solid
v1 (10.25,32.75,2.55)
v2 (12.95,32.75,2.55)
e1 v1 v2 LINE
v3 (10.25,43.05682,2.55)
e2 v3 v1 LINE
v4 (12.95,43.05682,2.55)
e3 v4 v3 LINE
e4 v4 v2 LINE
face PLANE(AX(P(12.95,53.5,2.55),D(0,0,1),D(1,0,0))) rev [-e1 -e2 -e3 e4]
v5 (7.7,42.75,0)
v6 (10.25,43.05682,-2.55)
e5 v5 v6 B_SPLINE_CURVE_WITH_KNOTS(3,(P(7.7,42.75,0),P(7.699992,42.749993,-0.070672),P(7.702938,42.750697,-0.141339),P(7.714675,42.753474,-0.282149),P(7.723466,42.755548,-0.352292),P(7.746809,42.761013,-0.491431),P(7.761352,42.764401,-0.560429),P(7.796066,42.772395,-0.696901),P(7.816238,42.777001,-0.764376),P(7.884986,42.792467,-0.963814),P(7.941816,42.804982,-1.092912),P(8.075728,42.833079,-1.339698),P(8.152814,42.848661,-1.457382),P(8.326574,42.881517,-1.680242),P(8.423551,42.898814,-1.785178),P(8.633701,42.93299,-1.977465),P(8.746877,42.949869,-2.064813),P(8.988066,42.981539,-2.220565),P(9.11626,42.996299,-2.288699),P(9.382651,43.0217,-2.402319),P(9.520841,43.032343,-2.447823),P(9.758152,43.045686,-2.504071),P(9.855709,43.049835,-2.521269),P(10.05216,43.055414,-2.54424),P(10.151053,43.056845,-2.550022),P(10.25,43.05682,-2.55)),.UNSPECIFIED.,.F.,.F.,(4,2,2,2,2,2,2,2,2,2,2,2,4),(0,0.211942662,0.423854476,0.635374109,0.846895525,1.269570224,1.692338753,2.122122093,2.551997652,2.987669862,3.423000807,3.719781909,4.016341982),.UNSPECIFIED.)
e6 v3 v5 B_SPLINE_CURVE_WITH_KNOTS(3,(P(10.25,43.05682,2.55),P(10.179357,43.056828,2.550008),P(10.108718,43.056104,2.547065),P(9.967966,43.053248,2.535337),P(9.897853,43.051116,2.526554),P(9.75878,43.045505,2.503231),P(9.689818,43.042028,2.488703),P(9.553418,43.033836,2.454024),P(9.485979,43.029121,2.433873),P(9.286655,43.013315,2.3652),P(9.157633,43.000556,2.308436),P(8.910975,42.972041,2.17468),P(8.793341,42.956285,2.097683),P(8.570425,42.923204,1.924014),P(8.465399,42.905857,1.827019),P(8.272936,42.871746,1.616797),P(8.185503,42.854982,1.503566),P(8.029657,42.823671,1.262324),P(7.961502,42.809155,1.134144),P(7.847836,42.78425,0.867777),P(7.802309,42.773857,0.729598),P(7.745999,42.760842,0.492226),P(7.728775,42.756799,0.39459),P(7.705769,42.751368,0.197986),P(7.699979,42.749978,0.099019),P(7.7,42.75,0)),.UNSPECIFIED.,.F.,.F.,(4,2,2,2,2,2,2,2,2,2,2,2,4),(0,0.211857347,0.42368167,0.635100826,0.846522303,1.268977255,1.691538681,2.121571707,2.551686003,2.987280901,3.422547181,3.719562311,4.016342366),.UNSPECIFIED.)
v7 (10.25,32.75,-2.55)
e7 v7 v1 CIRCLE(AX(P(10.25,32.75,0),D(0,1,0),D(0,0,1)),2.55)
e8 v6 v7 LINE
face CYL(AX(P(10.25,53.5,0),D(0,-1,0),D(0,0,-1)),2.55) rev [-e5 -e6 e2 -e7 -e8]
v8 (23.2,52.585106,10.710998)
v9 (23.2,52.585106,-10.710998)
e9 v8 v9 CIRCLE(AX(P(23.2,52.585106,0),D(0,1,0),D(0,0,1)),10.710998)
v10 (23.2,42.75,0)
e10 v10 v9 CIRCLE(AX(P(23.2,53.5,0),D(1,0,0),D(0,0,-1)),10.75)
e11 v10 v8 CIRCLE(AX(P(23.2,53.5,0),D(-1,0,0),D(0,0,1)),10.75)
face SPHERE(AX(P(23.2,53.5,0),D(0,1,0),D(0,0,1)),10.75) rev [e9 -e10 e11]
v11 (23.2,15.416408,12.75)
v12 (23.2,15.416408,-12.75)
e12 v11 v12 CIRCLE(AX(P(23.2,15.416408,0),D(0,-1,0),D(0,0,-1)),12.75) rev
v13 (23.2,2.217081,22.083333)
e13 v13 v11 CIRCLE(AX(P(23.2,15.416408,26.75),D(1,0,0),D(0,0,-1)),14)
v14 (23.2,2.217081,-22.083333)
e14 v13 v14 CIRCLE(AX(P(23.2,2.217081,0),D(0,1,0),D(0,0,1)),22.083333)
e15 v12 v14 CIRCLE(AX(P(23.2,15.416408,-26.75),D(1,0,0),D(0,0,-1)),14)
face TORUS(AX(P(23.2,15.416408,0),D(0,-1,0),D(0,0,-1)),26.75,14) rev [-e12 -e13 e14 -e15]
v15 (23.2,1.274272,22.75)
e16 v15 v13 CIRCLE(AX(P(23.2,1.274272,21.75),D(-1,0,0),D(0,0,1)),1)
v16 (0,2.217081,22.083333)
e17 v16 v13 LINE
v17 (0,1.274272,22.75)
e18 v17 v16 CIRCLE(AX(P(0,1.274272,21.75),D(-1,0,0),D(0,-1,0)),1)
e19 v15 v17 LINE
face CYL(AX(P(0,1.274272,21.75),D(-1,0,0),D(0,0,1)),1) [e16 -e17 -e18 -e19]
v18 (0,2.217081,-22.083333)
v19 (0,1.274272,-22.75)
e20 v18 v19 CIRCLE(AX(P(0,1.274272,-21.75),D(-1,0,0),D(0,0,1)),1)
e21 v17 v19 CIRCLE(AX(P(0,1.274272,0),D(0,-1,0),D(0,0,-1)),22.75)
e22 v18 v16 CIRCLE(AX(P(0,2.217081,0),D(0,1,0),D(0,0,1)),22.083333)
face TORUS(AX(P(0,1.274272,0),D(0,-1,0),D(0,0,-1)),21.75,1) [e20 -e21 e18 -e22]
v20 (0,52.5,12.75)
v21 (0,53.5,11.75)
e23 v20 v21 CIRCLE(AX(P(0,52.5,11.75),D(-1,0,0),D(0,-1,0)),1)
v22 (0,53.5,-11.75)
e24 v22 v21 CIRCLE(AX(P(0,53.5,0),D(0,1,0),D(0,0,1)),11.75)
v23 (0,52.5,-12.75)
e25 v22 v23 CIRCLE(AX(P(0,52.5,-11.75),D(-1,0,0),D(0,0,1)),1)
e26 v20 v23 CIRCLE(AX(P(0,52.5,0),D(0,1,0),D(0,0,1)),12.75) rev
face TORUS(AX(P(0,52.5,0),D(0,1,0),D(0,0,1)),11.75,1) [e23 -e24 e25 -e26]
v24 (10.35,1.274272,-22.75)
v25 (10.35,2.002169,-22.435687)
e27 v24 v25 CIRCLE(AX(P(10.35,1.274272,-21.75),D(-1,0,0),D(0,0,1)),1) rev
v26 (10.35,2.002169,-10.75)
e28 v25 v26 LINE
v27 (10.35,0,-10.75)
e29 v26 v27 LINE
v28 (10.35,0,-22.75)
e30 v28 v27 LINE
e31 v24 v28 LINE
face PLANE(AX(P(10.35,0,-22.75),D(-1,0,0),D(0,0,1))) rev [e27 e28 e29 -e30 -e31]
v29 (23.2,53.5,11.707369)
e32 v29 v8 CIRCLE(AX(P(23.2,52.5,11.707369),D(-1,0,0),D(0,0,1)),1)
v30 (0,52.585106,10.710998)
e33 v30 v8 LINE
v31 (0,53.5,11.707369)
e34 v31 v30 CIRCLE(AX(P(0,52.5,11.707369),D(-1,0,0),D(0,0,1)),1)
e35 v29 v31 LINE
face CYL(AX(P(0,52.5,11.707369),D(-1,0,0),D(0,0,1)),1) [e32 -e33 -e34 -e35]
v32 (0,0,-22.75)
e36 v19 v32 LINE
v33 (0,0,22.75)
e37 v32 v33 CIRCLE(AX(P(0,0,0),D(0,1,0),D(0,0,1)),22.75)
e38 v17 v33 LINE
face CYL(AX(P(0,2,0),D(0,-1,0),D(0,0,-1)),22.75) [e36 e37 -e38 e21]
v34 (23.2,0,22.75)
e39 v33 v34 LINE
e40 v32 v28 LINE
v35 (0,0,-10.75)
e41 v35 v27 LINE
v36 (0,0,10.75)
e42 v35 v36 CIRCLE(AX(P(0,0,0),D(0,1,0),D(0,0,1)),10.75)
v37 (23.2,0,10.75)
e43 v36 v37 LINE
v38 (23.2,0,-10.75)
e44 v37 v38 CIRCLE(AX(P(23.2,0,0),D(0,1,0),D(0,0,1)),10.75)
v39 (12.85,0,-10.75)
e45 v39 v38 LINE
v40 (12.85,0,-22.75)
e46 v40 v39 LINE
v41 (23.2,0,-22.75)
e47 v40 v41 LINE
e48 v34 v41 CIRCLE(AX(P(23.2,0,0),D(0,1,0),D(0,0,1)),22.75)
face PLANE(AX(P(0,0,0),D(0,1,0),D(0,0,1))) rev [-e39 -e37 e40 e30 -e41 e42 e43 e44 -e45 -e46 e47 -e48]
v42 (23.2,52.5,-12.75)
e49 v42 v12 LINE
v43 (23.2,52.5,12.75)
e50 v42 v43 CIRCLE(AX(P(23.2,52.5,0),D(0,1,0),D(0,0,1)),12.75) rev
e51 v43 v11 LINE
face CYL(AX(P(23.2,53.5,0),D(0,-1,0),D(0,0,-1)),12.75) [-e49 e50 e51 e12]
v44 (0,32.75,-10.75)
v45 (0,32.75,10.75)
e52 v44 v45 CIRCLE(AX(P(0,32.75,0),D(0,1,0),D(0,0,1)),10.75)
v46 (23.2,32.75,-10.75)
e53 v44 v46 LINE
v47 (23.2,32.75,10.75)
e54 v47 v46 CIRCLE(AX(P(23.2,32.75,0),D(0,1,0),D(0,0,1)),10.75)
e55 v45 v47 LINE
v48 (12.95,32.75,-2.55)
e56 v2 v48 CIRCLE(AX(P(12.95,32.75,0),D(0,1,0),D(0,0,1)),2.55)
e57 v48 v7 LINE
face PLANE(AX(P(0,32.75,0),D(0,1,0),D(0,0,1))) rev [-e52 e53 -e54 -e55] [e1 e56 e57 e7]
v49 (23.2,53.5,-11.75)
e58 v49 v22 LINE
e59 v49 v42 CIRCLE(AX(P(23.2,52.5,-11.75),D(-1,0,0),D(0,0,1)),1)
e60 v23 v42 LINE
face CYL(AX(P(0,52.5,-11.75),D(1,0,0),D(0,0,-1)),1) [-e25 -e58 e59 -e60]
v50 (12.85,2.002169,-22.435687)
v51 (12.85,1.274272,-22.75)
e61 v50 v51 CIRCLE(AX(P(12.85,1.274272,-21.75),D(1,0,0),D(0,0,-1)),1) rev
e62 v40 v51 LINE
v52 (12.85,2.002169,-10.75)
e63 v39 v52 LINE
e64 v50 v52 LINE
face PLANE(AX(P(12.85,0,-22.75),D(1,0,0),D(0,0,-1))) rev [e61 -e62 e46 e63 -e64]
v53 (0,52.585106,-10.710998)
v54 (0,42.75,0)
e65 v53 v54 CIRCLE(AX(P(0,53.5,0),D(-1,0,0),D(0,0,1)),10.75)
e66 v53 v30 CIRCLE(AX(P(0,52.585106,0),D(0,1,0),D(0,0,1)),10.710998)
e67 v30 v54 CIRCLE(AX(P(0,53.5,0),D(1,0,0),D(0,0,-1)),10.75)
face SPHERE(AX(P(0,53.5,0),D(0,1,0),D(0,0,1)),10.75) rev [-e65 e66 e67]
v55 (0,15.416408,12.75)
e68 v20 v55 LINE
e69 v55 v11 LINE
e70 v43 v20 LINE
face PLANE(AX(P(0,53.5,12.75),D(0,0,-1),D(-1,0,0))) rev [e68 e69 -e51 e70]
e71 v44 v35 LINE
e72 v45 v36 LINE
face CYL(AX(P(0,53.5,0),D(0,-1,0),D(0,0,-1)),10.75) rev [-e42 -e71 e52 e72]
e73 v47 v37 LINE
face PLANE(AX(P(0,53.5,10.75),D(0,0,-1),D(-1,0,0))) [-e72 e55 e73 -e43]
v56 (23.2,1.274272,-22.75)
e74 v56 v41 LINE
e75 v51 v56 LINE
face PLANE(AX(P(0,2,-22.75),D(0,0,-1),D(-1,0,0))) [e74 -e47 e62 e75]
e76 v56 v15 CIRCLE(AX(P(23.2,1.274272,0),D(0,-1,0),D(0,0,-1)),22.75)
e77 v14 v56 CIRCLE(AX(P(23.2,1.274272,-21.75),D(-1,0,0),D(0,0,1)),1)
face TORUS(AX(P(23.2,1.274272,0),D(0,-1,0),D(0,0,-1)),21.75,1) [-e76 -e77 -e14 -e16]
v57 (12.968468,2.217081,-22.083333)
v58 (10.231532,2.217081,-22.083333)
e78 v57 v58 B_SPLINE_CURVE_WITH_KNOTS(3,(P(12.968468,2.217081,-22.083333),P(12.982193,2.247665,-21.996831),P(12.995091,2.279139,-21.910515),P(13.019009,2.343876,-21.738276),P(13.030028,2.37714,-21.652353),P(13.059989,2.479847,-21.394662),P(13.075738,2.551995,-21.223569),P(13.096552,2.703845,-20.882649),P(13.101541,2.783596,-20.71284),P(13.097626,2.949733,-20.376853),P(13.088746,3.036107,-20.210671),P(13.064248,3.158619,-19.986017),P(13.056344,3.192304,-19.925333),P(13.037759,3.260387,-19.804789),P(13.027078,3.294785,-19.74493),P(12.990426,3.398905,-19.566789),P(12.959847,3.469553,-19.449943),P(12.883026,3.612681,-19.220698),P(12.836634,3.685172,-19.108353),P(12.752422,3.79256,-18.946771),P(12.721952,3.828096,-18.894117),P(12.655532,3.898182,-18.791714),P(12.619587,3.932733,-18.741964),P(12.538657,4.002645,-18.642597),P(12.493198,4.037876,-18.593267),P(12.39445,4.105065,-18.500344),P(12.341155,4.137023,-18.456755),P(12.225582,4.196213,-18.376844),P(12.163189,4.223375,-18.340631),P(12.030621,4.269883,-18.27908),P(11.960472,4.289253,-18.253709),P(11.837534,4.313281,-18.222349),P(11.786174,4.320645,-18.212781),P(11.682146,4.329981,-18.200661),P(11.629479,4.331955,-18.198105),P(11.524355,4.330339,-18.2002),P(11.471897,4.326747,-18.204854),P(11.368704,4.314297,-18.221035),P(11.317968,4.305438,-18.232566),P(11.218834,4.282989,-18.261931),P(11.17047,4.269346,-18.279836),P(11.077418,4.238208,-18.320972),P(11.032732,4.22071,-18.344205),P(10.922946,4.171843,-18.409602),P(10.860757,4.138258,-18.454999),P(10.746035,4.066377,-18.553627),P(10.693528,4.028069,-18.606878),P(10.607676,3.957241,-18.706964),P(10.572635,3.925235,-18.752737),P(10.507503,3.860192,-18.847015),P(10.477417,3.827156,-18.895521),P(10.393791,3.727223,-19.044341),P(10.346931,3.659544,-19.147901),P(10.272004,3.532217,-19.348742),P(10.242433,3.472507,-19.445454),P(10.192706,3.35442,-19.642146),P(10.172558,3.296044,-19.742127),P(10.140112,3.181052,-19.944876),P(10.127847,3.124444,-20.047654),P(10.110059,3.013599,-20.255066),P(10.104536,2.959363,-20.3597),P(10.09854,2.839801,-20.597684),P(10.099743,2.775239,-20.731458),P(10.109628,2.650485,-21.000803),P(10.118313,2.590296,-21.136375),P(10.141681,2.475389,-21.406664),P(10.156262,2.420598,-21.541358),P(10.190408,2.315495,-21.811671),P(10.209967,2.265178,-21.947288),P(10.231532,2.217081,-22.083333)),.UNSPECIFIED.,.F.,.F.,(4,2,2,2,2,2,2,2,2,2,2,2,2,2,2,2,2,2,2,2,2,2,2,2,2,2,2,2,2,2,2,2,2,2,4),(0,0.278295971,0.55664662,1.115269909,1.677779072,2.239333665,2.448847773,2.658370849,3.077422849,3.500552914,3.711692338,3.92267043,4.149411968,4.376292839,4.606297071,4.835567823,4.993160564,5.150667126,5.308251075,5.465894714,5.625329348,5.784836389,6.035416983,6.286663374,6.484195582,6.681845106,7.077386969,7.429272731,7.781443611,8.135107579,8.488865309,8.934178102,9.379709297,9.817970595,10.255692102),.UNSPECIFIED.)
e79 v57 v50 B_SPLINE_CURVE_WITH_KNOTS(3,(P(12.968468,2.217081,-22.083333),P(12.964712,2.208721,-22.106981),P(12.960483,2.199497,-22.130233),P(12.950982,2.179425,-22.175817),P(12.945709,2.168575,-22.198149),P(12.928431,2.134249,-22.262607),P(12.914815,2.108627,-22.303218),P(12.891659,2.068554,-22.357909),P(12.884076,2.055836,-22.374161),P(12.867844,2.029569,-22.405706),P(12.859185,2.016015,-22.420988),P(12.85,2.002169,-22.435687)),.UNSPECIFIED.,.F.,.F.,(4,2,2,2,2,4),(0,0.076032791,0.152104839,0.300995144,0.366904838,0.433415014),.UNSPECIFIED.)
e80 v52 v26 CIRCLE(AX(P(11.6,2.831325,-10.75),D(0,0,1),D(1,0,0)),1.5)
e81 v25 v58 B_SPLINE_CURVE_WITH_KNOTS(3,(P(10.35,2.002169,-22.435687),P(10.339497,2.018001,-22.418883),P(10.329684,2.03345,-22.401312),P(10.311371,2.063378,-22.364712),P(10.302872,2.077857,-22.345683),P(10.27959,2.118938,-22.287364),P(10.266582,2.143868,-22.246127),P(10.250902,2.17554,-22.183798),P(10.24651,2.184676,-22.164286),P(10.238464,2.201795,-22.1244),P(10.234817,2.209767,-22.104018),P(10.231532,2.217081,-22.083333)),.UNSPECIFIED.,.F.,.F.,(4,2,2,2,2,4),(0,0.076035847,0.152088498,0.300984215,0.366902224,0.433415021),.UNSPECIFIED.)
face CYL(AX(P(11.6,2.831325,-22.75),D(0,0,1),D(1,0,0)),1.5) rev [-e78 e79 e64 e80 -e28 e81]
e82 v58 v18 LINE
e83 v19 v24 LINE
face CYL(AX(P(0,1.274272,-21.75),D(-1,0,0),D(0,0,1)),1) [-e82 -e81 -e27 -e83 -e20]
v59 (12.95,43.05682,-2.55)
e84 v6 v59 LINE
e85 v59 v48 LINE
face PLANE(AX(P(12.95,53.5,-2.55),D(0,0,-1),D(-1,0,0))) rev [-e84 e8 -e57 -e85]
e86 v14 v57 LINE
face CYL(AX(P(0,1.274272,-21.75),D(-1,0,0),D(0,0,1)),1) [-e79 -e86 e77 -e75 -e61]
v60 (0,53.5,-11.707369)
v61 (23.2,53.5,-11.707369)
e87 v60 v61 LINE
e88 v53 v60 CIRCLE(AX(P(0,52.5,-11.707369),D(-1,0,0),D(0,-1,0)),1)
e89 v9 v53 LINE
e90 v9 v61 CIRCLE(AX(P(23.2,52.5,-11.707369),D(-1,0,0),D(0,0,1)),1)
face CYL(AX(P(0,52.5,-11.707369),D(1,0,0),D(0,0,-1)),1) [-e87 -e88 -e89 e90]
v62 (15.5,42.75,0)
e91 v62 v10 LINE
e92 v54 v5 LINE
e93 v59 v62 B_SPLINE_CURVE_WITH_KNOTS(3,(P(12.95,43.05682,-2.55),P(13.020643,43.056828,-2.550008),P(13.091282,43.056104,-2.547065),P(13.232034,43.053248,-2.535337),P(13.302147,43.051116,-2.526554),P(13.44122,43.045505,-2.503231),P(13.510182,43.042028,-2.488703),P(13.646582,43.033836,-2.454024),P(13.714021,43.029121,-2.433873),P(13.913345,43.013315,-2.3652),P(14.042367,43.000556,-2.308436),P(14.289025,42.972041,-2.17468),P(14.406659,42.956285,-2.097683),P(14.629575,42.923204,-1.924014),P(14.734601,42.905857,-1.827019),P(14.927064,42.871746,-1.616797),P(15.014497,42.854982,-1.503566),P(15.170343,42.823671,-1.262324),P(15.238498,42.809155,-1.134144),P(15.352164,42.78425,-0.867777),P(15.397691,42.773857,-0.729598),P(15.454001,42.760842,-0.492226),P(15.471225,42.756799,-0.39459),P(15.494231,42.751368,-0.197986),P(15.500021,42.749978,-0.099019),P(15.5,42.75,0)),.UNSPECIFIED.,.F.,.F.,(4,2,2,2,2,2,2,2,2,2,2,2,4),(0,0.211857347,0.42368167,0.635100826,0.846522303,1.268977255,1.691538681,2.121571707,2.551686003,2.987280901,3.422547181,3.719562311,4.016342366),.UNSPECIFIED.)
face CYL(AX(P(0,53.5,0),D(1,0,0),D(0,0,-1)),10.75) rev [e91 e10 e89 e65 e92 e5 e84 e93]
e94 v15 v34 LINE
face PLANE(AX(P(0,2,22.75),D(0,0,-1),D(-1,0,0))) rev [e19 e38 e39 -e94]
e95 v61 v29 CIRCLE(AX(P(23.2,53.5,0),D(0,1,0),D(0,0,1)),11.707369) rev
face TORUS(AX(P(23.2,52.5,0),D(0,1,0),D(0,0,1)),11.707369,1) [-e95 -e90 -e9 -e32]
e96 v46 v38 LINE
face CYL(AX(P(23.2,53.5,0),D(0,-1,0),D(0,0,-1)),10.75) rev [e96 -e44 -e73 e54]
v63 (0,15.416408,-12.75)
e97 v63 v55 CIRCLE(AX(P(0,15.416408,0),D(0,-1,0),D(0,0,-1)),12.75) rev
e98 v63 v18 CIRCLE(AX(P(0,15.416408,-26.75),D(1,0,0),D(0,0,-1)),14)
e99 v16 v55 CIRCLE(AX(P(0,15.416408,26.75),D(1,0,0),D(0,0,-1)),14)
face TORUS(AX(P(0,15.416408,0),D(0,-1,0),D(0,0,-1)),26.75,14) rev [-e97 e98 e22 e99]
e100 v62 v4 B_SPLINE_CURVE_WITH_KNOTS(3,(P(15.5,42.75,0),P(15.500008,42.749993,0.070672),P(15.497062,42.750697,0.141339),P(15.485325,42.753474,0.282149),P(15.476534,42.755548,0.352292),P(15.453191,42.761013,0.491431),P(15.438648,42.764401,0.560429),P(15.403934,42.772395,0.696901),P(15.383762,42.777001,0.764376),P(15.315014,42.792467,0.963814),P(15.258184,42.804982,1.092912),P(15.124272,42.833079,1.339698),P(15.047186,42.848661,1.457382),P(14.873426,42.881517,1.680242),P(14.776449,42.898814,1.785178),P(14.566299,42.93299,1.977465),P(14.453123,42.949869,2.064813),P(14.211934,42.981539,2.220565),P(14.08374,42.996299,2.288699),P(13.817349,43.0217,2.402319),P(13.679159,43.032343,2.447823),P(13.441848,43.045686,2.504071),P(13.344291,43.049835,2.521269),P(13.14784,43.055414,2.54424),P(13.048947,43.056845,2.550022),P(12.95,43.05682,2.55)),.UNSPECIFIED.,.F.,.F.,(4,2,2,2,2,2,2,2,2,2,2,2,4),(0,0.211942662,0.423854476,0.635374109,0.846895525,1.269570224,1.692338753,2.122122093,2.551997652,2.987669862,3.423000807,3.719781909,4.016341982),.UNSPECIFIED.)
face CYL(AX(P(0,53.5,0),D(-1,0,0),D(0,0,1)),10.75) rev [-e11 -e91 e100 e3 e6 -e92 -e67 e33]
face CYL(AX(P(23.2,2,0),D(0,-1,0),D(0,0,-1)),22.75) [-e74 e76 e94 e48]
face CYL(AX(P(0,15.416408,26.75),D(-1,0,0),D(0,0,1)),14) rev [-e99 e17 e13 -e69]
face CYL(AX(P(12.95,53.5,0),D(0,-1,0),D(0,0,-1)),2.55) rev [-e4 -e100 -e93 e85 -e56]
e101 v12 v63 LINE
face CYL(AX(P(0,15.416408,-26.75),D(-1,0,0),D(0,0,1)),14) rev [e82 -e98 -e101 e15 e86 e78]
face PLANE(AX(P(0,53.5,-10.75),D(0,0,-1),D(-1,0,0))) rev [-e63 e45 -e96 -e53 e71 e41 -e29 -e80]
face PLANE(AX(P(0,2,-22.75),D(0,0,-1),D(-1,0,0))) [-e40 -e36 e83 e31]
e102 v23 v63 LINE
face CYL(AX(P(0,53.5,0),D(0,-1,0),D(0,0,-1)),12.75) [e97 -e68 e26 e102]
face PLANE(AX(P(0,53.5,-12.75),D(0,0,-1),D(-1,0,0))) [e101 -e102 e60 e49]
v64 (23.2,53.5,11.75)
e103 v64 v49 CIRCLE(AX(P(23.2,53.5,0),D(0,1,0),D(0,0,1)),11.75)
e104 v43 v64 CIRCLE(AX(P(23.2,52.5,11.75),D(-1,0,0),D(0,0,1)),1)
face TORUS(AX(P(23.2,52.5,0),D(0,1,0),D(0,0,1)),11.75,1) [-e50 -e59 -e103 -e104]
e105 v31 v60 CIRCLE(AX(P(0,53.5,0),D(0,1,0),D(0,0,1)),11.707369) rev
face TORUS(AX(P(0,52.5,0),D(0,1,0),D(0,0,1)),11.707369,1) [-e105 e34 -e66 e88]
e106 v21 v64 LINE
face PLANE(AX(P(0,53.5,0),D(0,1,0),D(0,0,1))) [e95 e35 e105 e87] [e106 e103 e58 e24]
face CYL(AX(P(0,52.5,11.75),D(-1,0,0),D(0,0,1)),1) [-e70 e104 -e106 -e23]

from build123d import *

# Parameters (mm, degrees)
BOSS_EXTRUDE1_DEPTH     = 53.5
BOSS_EXTRUDE2_START     = 32.75
BOSS_EXTRUDE2_DEPTH     = 10
BOSS_EXTRUDE3_DEPTH     = 2
FILLET1_R               = 10.75
FILLET2_R               = 14
FILLET3_R               = 1
CUT_EXTRUDE4_DEPTH      = 79.076260797
CUT_EXTRUDE5_DEPTH      = 61.840180017
CUT_EXTRUDE5_DEPTH_BACK = 61.840180017


# Some blends are built 0.0001 mm under size
with BuildPart() as part:
    # Sketch2 → Boss-Extrude1 (new body)
    with BuildSketch(Plane(origin=(0, 0, 0), x_dir=(1, 0, 0), z_dir=(0, 1, 0))):
        with BuildLine():
            Line((0, -12.75), (23.2, -12.75))
            ThreePointArc((23.2, -12.75), (35.95, 0), (23.2, 12.75))
            Line((23.2, 12.75), (0, 12.75))
            ThreePointArc((0, 12.75), (-12.75, 0), (0, -12.75))
        make_face()
        with BuildLine():
            ThreePointArc((23.2, -10.75), (33.95, 0), (23.2, 10.75))
            Line((23.2, 10.75), (0, 10.75))
            ThreePointArc((0, 10.75), (-10.75, 0), (0, -10.75))
            Line((0, -10.75), (23.2, -10.75))
        make_face(mode=Mode.SUBTRACT)
    extrude(amount=BOSS_EXTRUDE1_DEPTH)

    # Sketch2<3> → Boss-Extrude2 (add)
    with BuildSketch(Plane(origin=(0, 0, 0), x_dir=(1, 0, 0), z_dir=(0, 1, 0)).offset(BOSS_EXTRUDE2_START)):
        with BuildLine():
            Line((0, -10.75), (23.2, -10.75))
            ThreePointArc((23.2, -10.75), (33.95, 0), (23.2, 10.75))
            Line((23.2, 10.75), (0, 10.75))
            ThreePointArc((0, 10.75), (-10.75, 0), (0, -10.75))
        make_face()
    extrude(amount=BOSS_EXTRUDE2_DEPTH)

    # Sketch2<4> → Boss-Extrude3 (add)
    with BuildSketch(Plane(origin=(0, 0, 0), x_dir=(1, 0, 0), z_dir=(0, 1, 0))):
        with BuildLine():
            Line((0, 22.75), (23.2, 22.75))
            ThreePointArc((23.2, 22.75), (45.95, 0), (23.2, -22.75))
            Line((23.2, -22.75), (0, -22.75))
            ThreePointArc((0, -22.75), (-22.75, 0), (0, 22.75))
        make_face()
        with BuildLine():
            ThreePointArc((23.2, -12.75), (35.95, 0), (23.2, 12.75))
            Line((23.2, 12.75), (0, 12.75))
            ThreePointArc((0, 12.75), (-12.75, 0), (0, -12.75))
            Line((0, -12.75), (23.2, -12.75))
        make_face(mode=Mode.SUBTRACT)
    extrude(amount=BOSS_EXTRUDE3_DEPTH)

    # Fillet1
    fillet1_edges = [part.edges().sort_by_distance(p)[0] for p in [
        (11.6, 42.75, -10.75),
        (33.95, 42.75, 0),
        (11.6, 42.75, 10.75),
        (-10.75, 42.75, 0),
    ]]
    fillet(fillet1_edges, radius=FILLET1_R - 0.0001)  # a hair under: the kernel refuses the full size

    # Fillet2
    # the kernel refuses this fillet: 14 mm, written as the material it adds along each edge
    with BuildSketch(Plane(origin=(23.2, 2, 0), x_dir=(0, 0, 1), z_dir=(-1, 0, 0))) as fillet2_piece_1:
        with BuildLine():
            CenterArc((26.75, 13.416407865), FILLET2_R, 180, 73.398450401)
            Line((22.75, 0), (22.67, -0.268328157))
            ThreePointArc((22.67, -0.268328157), (17.75, -0.28), (12.75, -0.28))
            Line((12.75, -0.28), (12.47, 0))
            Line((12.47, 0), (12.47, 13.416407865))
            Line((12.47, 13.416407865), (12.75, 13.416407865))
        make_face()
    revolve(axis=Axis((23.2, 2, 0), (0, 1, 0)), revolution_arc=180)
    with BuildSketch(Plane(origin=(0, 2, 12.75), x_dir=(0, 1, 0), z_dir=(1, 0, 0)), Plane(origin=(23.2, 2, -12.75), x_dir=(0, 1, 0), z_dir=(-1, 0, 0))) as fillet2_piece_2:
        with BuildLine():
            CenterArc((13.416407865, 14), FILLET2_R, 196.601549599, 73.398450401)
            Line((0, 10), (-0.268328157, 9.92))
            ThreePointArc((-0.268328157, 9.92), (-0.28, 5), (-0.28, 0))
            Line((-0.28, 0), (0, -0.28))
            Line((0, -0.28), (13.416407865, -0.28))
            Line((13.416407865, -0.28), (13.416407865, 0))
        make_face()
    extrude(amount=23.2)
    with BuildSketch(Plane(origin=(0, 2, 0), x_dir=(0, 0, -1), z_dir=(1, 0, 0))) as fillet2_piece_3:
        with BuildLine():
            CenterArc((26.75, 13.416407865), FILLET2_R, 180, 73.398450401)
            Line((22.75, 0), (22.67, -0.268328157))
            ThreePointArc((22.67, -0.268328157), (17.75, -0.28), (12.75, -0.28))
            Line((12.75, -0.28), (12.47, 0))
            Line((12.47, 0), (12.47, 13.416407865))
            Line((12.47, 13.416407865), (12.75, 13.416407865))
        make_face()
    revolve(axis=Axis((0, 2, 0), (0, 1, 0)), revolution_arc=180)

    # Fillet3
    # the kernel refuses this fillet: 1 mm, written as the material it takes off along each edge
    with BuildSketch(Plane(origin=(0, 53.5, 10.75), x_dir=(0, 0, 1), z_dir=(1, 0, 0)), Plane(origin=(23.2, 53.5, -10.75), x_dir=(0, 0, -1), z_dir=(-1, 0, 0))) as fillet3_piece_1:
        with BuildLine():
            CenterArc((0.957377651, 1), FILLET3_R, 184.881694581, 85.118305419)
            Line((-0.038994884, 0.914901403), (-0.138632138, 0.906391544))
            ThreePointArc((-0.138632138, 0.906391544), (-0.1, 0.0001), (-0.1, 0))
            Line((-0.1, 0), (0, -0.1))
            Line((0, -0.1), (0.957377651, -0.1))
            Line((0.957377651, -0.1), (0.957377651, 0))
        make_face()
    extrude(amount=23.2, mode=Mode.SUBTRACT)
    with BuildSketch(Plane(origin=(0, 53.5, 0), x_dir=(0, 0, -1), z_dir=(1, 0, 0))) as fillet3_piece_2:
        with BuildLine():
            CenterArc((11.707377651, -1), FILLET3_R, 90, 85.118305419)
            Line((10.711005116, -0.914901403), (10.611367862, -0.906391544))
            ThreePointArc((10.611367862, -0.906391544), (10.65, -0.0001), (10.65, 0))
            Line((10.65, 0), (10.75, 0.1))
            Line((10.75, 0.1), (11.707377651, 0.1))
            Line((11.707377651, 0.1), (11.707377651, 0))
        make_face()
    revolve(axis=Axis((0, 53.5, 0), (0, 1, 0)), revolution_arc=180, mode=Mode.SUBTRACT)
    with BuildSketch(Plane(origin=(0, 53.5, 12.75), x_dir=(0, -1, 0), z_dir=(1, 0, 0))) as fillet3_piece_3:
        with BuildLine():
            CenterArc((FILLET3_R, FILLET3_R), FILLET3_R, 180, 90)
            Line((0, FILLET3_R), (0, 0))
            Line((0, 0), (FILLET3_R, 0))
        make_face()
    extrude(amount=23.2, mode=Mode.SUBTRACT)
    with BuildSketch(Plane(origin=(23.2, 53.5, 0), x_dir=(0, 0, 1), z_dir=(-1, 0, 0))) as fillet3_piece_4:
        with BuildLine():
            CenterArc((12.75 - FILLET3_R, -FILLET3_R), FILLET3_R, 0, 90)
            Line((12.75, -FILLET3_R), (12.75, 0))
            Line((12.75, 0), (12.75 - FILLET3_R, 0))
        make_face()
    revolve(axis=Axis((23.2, 53.5, 0), (0, 1, 0)), revolution_arc=180, mode=Mode.SUBTRACT)
    with BuildSketch(Plane(origin=(23.2, 53.5, -12.75), x_dir=(0, 0, 1), z_dir=(-1, 0, 0))) as fillet3_piece_5:
        with BuildLine():
            CenterArc((FILLET3_R, -FILLET3_R), FILLET3_R, 90, 90)
            Line((0, -FILLET3_R), (0, 0))
            Line((0, 0), (FILLET3_R, 0))
        make_face()
    extrude(amount=23.2, mode=Mode.SUBTRACT)
    with BuildSketch(Plane(origin=(0, 53.5, 0), x_dir=(0, 0, -1), z_dir=(1, 0, 0))) as fillet3_piece_6:
        with BuildLine():
            CenterArc((12.75 - FILLET3_R, -FILLET3_R), FILLET3_R, 0, 90)
            Line((12.75 - FILLET3_R, 0), (12.75, 0))
            Line((12.75, 0), (12.75, -FILLET3_R))
        make_face()
    revolve(axis=Axis((0, 53.5, 0), (0, 1, 0)), revolution_arc=180, mode=Mode.SUBTRACT)
    with BuildSketch(Plane(origin=(0, 2, -22.75), x_dir=(0, 0.30962089103713925, 0.9508600863604318), z_dir=(1, 0, 0)), Plane(origin=(23.2, 2, 22.75), x_dir=(0, 0.30962089103713925, -0.9508600863604318), z_dir=(-1, 0, 0))) as fillet3_piece_7:
        with BuildLine():
            CenterArc((0.726159611, 0.99968645), FILLET3_R, 198.036385117, 70.528779366)
            Line((-0.224700475, 0.690065559), (0, 0))
            ThreePointArc((0, 0), (0.350559812, 0.004389695), (0.701119624, 0))
        make_face()
    extrude(amount=23.2, mode=Mode.SUBTRACT)
    with BuildSketch(Plane(origin=(0, 2, 0), x_dir=(0, 0, 1), z_dir=(1, 0, 0))) as fillet3_piece_8:
        with BuildLine():
            CenterArc((21.75, 0.725727759), FILLET3_R, 289.471220634, 70.528779366)
            Line((22.75, 0.725727759), (22.75, 0))
            ThreePointArc((22.75, 0), (22.415307525, -0.104366656), (22.083333333, -0.217081283))
        make_face()
    revolve(axis=Axis((0, 2, 0), (0, -1, 0)), revolution_arc=180, mode=Mode.SUBTRACT)
    with BuildSketch(Plane(origin=(23.2, 2, 0), x_dir=(0, 0, -1), z_dir=(-1, 0, 0))) as fillet3_piece_9:
        with BuildLine():
            CenterArc((21.75, 0.725727759), FILLET3_R, 289.471220634, 70.528779366)
            Line((22.75, 0.725727759), (22.75, 0))
            ThreePointArc((22.75, 0), (22.415307525, -0.104366656), (22.083333333, -0.217081283))
        make_face()
    revolve(axis=Axis((23.2, 2, 0), (0, -1, 0)), revolution_arc=180, mode=Mode.SUBTRACT)
    with BuildSketch(Plane(origin=(23.2, 53.5, 0), x_dir=(0, 0, 1), z_dir=(-1, 0, 0))) as fillet3_piece_10:
        with BuildLine():
            CenterArc((11.707377651, -1), FILLET3_R, 90, 85.118305419)
            Line((10.711005116, -0.914901403), (10.611367862, -0.906391544))
            ThreePointArc((10.611367862, -0.906391544), (10.65, -0.0001), (10.65, 0))
            Line((10.65, 0), (10.75, 0.1))
            Line((10.75, 0.1), (11.707377651, 0.1))
            Line((11.707377651, 0.1), (11.707377651, 0))
        make_face()
    revolve(axis=Axis((23.2, 53.5, 0), (0, 1, 0)), revolution_arc=180, mode=Mode.SUBTRACT)

    # Sketch4 → Cut-Extrude4 (cut, through all)
    with BuildSketch(Plane.XY.offset(-10.75)):
        with BuildLine():
            Line((11.6, 0), (12.85, 0))
            Line((12.85, 0), (12.85, 2.002168665))
            ThreePointArc((12.85, 2.002168665), (11.6, 4.331324862), (10.35, 2.002168665))
            Line((10.35, 2.002168665), (10.35, 0))
            Line((10.35, 0), (11.6, 0))
        make_face()
    extrude(amount=-CUT_EXTRUDE4_DEPTH, mode=Mode.SUBTRACT)

    # Sketch3 → Cut-Extrude5 (cut, two sides: drawn at the far end of the back side and taken through both)
    with BuildSketch(Plane.XZ.offset(-32.75).offset(-CUT_EXTRUDE5_DEPTH_BACK)):
        with BuildLine():
            Line((12.95, 2.55), (10.25, 2.55))
            ThreePointArc((10.25, 2.55), (7.7, 0), (10.25, -2.55))
            Line((10.25, -2.55), (12.95, -2.55))
            ThreePointArc((12.95, -2.55), (15.5, 0), (12.95, 2.55))
        make_face()
    extrude(amount=CUT_EXTRUDE5_DEPTH + CUT_EXTRUDE5_DEPTH_BACK, mode=Mode.SUBTRACT)


solid = part.part
